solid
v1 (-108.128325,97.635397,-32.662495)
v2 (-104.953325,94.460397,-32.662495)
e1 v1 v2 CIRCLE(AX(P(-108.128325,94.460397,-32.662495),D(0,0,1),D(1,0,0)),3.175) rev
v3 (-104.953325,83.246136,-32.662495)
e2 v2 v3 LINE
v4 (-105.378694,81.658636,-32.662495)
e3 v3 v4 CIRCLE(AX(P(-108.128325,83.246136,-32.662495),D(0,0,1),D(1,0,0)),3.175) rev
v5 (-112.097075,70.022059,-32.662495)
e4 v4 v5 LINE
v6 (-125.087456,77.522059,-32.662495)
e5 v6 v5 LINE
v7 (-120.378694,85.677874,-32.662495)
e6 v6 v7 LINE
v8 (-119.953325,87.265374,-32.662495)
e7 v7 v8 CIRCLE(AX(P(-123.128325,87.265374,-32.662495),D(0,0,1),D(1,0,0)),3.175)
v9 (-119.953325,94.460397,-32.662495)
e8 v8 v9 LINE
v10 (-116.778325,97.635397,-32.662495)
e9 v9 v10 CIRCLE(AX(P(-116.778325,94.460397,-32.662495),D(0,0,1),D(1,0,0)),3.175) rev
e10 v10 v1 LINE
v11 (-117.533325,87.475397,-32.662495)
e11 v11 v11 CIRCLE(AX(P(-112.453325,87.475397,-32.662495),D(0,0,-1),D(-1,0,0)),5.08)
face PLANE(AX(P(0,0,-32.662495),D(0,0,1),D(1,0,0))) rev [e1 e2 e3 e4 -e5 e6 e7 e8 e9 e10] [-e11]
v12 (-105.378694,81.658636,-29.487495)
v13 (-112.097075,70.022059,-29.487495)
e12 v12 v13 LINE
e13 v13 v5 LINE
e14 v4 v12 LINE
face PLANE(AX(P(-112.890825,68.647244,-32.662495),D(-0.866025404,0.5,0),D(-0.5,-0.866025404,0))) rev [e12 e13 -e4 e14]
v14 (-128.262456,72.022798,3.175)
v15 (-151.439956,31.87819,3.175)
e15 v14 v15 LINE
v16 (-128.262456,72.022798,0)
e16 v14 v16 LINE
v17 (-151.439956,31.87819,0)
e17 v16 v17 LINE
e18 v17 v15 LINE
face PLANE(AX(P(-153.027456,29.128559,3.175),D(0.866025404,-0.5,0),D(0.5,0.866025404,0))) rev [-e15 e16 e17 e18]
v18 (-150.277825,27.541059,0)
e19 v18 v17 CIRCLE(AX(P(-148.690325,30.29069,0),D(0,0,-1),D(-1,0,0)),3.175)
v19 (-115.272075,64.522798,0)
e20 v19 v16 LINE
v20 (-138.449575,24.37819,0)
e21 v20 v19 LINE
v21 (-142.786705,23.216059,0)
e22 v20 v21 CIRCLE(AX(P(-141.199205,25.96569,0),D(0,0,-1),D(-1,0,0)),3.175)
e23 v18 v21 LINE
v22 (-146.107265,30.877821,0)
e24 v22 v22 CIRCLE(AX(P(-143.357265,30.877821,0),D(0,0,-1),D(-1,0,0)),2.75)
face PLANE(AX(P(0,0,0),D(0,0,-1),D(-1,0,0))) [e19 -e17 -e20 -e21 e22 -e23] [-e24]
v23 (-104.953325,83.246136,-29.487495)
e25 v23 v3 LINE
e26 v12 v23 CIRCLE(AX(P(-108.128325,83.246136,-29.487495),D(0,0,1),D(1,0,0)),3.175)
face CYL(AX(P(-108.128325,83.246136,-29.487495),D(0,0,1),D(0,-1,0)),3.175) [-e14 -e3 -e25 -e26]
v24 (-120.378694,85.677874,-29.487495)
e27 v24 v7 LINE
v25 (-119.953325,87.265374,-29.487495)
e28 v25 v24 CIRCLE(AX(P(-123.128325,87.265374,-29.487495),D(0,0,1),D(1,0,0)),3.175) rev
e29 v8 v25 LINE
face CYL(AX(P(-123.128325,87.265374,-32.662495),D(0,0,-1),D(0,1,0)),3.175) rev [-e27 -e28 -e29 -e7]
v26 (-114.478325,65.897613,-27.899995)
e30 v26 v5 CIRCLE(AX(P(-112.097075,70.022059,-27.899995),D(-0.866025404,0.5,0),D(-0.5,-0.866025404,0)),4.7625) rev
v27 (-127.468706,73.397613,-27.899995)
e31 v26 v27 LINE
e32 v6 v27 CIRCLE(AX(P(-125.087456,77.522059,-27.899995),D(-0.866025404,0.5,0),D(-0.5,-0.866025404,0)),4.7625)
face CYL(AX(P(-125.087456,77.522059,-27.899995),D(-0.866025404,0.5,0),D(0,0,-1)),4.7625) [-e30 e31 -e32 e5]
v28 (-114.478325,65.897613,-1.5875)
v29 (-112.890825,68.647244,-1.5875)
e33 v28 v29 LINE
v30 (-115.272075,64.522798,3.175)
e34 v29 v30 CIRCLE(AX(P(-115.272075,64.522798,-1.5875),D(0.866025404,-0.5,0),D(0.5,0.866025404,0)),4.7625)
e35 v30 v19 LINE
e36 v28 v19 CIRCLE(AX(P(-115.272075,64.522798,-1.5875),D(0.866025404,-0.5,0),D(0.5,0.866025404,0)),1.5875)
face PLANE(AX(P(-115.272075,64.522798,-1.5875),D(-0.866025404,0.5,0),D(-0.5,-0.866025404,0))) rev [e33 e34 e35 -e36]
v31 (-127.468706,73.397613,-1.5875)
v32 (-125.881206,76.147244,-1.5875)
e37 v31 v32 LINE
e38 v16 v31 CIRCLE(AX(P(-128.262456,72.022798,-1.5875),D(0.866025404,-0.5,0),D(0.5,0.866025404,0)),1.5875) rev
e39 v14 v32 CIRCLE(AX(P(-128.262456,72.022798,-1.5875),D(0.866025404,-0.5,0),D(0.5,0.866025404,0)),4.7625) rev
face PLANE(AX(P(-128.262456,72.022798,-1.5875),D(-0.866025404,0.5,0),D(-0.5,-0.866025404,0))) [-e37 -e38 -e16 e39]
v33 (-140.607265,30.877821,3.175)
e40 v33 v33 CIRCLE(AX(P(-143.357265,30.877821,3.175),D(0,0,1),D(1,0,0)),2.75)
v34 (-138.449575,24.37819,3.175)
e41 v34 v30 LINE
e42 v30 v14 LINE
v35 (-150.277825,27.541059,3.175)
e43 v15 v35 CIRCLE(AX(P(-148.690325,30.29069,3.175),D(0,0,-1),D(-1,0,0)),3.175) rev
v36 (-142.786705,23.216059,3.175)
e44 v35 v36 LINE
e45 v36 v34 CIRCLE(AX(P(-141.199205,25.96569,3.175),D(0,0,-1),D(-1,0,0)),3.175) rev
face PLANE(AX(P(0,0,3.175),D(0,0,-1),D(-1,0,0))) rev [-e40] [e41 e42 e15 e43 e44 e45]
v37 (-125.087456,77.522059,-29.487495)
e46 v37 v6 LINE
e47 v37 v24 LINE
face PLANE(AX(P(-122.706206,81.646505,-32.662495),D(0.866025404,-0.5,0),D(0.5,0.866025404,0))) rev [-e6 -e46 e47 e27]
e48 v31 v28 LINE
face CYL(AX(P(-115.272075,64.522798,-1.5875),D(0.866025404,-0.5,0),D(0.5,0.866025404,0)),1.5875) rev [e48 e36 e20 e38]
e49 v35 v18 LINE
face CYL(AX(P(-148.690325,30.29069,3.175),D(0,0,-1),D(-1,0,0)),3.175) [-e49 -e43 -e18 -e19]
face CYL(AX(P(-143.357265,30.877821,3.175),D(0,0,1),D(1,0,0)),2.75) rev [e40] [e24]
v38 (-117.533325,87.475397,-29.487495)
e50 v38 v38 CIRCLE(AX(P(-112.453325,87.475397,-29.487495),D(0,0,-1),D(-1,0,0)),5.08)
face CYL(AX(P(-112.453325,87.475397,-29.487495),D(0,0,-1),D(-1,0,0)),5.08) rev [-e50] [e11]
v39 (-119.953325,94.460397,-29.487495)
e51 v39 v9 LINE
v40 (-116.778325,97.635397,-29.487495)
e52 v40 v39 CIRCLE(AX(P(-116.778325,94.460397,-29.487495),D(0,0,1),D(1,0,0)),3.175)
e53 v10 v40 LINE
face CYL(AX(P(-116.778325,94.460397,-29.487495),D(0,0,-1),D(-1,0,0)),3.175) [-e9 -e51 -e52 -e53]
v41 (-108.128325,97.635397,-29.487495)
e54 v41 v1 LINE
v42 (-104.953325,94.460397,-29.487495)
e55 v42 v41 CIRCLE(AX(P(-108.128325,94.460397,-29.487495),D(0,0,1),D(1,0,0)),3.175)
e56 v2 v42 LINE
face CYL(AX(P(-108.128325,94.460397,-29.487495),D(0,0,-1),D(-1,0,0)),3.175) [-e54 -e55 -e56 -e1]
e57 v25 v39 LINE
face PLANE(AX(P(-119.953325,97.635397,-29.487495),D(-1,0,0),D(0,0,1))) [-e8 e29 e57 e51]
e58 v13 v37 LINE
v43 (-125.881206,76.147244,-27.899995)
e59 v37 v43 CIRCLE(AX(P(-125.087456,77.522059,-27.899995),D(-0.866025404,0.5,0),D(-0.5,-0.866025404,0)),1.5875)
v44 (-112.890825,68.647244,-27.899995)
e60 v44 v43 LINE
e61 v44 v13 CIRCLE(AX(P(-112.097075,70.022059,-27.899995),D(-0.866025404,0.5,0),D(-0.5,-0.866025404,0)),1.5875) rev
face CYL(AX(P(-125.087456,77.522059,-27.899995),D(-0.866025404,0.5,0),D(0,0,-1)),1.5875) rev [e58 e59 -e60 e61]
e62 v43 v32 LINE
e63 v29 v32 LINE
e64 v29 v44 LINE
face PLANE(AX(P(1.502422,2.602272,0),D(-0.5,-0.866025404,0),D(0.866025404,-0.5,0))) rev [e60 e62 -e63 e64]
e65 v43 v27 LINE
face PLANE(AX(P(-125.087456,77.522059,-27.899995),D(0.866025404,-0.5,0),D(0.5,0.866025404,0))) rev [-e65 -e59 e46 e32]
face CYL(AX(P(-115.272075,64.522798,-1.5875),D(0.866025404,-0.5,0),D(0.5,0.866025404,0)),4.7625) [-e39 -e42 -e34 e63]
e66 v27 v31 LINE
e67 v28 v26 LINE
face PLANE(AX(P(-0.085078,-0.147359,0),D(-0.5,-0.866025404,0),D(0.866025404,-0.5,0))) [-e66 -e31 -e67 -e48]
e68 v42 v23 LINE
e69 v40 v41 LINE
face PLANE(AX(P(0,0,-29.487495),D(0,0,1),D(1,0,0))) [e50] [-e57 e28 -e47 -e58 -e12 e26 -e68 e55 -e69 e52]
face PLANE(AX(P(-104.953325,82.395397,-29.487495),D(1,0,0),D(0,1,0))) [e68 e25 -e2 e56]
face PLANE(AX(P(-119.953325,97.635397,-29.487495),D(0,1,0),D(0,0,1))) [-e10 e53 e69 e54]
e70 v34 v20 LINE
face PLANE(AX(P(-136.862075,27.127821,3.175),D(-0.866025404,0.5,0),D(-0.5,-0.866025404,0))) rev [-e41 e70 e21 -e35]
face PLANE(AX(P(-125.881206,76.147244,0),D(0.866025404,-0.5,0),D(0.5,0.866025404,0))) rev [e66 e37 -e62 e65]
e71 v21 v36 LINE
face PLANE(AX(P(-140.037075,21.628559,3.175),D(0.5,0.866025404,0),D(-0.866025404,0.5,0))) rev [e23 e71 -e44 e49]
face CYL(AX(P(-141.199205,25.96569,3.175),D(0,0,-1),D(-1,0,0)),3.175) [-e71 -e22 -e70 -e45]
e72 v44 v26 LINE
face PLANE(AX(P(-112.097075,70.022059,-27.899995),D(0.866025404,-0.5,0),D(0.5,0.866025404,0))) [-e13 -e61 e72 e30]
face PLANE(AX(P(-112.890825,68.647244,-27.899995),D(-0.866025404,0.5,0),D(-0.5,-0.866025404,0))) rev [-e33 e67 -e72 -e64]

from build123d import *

# Parameters (mm, degrees)
BASE_FLANGE1_DEPTH   = 3.175
EDGE_FLANGE1_DEPTH   = 15
EDGE_FLANGE2_DEPTH   = 15
SKETCH15_R           = 5.08
BOSS_EXTRUDE1_DEPTH  = 3.175
M5_CLEARANCE_HOLE1_D = 5.5
FILLET1_R            = 3.175


# Sheet-metal steps are written as plain solids
with BuildPart() as part:
    # Sketch2 → Base-Flange1 (new body)
    with BuildSketch(Plane.XY):
        Polygon((-136.862074611, 27.127820722), (-140.037074611, 21.628559408), (-153.027455668, 29.128559408), (-149.852455668, 34.627820722), (-128.262455668, 72.022797657), (-115.272074611, 64.522797657), align=None)
    extrude(amount=BASE_FLANGE1_DEPTH)

    # Edge-Flange1 section (across the edge) → Edge-Flange1 (add)
    with BuildSketch(Plane(origin=(-127.468705668, 73.397612986, 0), x_dir=(-0.49999999999999706, -0.8660254037844404, -3.491481338843133e-15), z_dir=(0.8660254037844404, -0.49999999999999706, 0))):
        with BuildLine():
            Line((-3.175, 1.5875), (-3.175, 27.899995))
            Line((-3.175, 27.899995), (0, 27.899995))
            Line((0, 27.899995), (0, 1.5875))
            ThreePointArc((0, 1.5875), (0.464967985, 0.464967985), (1.5875, 0))
            Line((1.5875, 0), (1.5875, -3.175))
            ThreePointArc((1.5875, -3.175), (-1.780096045, -1.780096045), (-3.175, 1.5875))
        make_face()
    extrude(amount=EDGE_FLANGE1_DEPTH)

    # Edge-Flange2 section (across the edge) → Edge-Flange2 (add)
    with BuildSketch(Plane(origin=(-112.890824611, 68.647243643, -29.487495), x_dir=(0, 0, 1), z_dir=(-0.8660254037844405, 0.4999999999999967, 0))):
        with BuildLine():
            Line((-3.175, 1.5875), (-3.175, 6.35))
            Line((-3.175, 6.35), (0, 6.35))
            Line((0, 6.35), (0, 1.5875))
            ThreePointArc((0, 1.5875), (0.464967985, 0.464967985), (1.5875, 0))
            Line((1.5875, 0), (1.5875, -3.175))
            ThreePointArc((1.5875, -3.175), (-1.780096045, -1.780096045), (-3.175, 1.5875))
        make_face()
    extrude(amount=EDGE_FLANGE2_DEPTH)

    # Sketch15 → Boss-Extrude1 (add)
    with BuildSketch(Plane(origin=(0, 0, -32.662495), x_dir=(-1, 0, 0), z_dir=(0, 0, -1))):
        Polygon((122.706205668, 81.646504957), (109.715824611, 74.146504957), (104.953324611, 82.395396928), (104.953324611, 97.635396928), (119.953324611, 97.635396928), (119.953324611, 86.414634815), align=None)
        with Locations((112.453324611, 87.475396928)):
            Circle(SKETCH15_R, mode=Mode.SUBTRACT)
    extrude(amount=-BOSS_EXTRUDE1_DEPTH)

    # M5 Clearance Hole1 (through all)
    with Locations(Plane.XY.offset(3.175)):
        with Locations((-143.35726514, 30.877820722)):
            Hole(M5_CLEARANCE_HOLE1_D / 2)

    # Fillet1
    fillet1_edges = [part.edges().sort_by_distance(p)[0] for p in [
        (-140.037074611, 21.628559408, 1.5875),
        (-153.027455668, 29.128559408, 1.5875),
        (-119.953324611, 86.414634815, -31.074995),
        (-104.953324611, 82.395396928, -31.074995),
        (-104.953324611, 97.635396928, -31.074995),
        (-119.953324611, 97.635396928, -31.074995),
    ]]
    fillet(fillet1_edges, radius=FILLET1_R)


solid = part.part
